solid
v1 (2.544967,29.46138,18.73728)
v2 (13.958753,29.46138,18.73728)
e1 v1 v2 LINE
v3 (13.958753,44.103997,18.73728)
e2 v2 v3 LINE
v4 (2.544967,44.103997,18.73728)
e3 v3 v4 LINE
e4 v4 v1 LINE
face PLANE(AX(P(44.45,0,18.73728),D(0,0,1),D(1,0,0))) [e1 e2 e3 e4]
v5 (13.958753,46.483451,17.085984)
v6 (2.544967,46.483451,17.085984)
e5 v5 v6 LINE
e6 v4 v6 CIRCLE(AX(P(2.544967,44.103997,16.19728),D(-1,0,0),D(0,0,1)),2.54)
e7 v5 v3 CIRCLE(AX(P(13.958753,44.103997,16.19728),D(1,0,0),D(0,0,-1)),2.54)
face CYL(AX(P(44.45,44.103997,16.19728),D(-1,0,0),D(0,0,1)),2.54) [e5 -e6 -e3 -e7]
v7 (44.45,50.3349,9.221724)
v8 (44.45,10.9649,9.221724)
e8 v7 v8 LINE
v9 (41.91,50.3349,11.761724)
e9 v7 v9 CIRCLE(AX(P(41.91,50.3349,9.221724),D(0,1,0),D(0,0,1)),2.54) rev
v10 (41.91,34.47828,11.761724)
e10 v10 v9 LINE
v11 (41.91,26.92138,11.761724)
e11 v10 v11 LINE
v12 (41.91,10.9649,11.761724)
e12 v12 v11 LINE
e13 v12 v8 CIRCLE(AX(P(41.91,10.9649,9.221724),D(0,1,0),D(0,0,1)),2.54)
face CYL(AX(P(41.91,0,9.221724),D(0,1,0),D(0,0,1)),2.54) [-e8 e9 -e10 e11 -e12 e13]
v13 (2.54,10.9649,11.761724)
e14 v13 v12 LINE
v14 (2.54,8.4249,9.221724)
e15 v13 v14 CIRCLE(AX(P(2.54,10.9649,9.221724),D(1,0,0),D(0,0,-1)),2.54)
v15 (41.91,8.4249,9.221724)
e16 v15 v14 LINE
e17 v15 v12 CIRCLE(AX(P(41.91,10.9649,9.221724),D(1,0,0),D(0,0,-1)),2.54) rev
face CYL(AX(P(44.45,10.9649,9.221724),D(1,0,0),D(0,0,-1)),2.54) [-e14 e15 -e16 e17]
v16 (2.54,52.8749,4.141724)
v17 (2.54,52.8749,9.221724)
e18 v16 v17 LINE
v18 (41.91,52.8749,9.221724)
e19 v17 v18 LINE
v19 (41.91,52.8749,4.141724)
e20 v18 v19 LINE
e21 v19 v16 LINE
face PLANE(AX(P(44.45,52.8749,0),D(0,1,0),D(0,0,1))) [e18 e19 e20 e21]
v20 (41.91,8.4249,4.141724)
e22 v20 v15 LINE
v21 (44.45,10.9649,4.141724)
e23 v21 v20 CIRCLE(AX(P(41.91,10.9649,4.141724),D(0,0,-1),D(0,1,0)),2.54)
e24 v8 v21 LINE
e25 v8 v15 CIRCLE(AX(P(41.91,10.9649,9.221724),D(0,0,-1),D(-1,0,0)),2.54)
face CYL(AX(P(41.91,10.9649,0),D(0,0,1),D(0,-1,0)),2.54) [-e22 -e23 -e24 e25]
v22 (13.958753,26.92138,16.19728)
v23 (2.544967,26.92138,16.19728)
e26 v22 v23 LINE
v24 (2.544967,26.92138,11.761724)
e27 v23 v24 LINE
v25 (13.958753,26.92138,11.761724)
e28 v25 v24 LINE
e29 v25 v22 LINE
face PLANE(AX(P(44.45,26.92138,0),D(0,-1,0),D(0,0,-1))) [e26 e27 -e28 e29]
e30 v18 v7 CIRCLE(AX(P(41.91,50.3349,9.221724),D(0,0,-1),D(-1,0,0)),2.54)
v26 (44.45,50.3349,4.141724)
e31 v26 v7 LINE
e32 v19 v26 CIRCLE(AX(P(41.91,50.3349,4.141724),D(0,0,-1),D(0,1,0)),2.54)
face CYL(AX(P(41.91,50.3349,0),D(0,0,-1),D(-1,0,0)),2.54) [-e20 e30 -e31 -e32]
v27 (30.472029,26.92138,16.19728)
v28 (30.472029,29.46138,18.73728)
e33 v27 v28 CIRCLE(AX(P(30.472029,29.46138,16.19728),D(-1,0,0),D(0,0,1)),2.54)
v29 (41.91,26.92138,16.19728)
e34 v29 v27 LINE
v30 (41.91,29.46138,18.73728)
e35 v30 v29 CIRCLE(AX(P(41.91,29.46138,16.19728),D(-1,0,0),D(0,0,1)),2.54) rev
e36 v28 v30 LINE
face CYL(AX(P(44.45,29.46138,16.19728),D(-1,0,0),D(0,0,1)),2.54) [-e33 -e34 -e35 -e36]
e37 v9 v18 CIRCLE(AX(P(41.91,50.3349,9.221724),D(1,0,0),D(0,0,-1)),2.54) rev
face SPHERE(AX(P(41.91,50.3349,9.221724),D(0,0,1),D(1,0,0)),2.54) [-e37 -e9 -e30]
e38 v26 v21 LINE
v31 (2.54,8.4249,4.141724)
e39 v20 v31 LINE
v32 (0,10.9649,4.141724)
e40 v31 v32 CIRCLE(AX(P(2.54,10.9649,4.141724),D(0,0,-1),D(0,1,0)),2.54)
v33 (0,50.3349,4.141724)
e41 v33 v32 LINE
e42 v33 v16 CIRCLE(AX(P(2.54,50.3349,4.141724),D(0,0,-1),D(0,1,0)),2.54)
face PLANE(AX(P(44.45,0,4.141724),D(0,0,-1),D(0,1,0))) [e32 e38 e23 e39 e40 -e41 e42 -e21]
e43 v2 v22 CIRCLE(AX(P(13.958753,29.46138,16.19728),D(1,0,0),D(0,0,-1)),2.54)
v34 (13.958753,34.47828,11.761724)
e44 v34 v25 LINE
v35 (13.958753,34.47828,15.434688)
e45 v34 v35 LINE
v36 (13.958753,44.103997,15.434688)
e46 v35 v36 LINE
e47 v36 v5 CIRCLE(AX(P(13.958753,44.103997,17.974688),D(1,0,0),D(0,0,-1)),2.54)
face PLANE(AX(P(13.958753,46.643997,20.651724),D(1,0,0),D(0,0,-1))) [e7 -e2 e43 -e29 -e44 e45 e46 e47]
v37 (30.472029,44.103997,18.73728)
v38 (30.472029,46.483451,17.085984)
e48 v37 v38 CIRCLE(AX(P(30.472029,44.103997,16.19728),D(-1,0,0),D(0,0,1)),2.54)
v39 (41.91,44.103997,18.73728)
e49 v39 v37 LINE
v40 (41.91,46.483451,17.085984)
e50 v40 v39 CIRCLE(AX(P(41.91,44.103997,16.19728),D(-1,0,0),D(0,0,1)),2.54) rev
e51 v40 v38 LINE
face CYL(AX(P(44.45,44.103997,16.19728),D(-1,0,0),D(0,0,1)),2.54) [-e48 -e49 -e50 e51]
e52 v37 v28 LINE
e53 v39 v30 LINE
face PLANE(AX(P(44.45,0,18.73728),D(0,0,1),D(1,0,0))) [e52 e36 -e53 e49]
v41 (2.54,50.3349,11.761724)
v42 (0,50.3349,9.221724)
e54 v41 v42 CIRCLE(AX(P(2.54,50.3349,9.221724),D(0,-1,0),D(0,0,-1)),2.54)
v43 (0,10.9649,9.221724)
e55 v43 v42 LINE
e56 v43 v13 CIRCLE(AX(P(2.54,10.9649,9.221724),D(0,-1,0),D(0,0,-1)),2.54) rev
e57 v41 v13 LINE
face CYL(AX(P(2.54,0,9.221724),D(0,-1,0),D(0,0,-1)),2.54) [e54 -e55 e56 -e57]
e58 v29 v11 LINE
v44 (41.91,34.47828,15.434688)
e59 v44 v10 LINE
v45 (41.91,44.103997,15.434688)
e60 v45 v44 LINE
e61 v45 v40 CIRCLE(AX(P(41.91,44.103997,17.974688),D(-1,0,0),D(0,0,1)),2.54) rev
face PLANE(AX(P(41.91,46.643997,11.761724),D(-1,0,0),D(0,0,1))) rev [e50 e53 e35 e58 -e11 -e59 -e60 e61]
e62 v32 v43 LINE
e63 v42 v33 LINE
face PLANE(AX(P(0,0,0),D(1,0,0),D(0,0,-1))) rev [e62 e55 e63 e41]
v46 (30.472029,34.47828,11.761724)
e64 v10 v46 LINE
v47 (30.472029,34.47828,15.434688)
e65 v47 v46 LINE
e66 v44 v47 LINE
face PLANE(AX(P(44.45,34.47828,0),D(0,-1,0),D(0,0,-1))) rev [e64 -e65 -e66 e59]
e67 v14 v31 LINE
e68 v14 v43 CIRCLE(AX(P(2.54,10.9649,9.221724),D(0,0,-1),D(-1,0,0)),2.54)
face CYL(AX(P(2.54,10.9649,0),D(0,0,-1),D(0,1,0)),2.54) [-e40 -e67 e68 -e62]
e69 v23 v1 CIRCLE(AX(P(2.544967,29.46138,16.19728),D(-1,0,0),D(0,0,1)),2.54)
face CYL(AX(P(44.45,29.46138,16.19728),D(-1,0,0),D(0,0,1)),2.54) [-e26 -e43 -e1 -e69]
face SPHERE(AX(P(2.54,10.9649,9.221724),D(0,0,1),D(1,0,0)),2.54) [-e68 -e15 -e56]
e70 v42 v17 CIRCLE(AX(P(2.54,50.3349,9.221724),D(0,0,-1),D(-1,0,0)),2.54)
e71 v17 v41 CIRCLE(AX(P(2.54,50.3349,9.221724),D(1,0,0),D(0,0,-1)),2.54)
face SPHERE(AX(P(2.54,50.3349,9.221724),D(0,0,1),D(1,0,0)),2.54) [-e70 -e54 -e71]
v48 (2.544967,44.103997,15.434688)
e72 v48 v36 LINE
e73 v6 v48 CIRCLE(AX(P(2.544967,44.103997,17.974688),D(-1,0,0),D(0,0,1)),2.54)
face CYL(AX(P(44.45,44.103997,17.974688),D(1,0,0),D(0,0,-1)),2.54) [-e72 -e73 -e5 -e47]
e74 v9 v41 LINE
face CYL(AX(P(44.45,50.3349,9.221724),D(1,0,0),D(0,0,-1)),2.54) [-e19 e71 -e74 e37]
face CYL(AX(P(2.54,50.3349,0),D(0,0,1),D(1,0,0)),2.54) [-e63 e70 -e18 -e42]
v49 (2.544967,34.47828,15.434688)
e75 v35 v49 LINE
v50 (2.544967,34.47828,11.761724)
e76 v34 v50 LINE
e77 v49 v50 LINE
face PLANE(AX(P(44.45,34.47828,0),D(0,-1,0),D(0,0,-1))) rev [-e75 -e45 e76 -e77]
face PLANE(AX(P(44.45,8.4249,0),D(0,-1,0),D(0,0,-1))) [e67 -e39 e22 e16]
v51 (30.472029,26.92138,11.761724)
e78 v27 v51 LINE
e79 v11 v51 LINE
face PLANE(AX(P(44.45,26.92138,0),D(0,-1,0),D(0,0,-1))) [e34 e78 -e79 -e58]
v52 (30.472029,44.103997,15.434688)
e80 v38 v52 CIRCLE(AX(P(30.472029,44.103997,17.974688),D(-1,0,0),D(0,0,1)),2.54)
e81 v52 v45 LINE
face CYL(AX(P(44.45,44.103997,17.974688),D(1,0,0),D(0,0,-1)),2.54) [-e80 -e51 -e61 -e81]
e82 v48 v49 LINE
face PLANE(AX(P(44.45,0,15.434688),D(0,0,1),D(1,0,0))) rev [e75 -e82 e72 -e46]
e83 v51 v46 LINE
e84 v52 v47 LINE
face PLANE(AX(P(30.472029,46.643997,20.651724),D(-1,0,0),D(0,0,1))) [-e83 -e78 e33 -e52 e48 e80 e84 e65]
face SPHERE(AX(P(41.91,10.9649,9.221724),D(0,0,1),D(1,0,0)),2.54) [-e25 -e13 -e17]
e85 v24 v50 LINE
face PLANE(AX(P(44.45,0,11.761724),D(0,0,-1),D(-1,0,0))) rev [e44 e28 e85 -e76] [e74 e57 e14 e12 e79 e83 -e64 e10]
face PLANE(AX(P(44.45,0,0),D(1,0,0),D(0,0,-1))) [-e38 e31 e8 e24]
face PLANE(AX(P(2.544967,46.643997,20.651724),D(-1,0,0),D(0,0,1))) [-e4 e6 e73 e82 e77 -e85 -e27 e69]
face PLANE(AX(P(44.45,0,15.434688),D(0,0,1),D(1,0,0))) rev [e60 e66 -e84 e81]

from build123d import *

# Parameters (mm, degrees)
BOSS_EXTRUDE1_DEPTH     = 44.45
CUT_EXTRUDE1_DEPTH      = 6.35
CUT_EXTRUDE1_DEPTH_BACK = 3.81
SKETCH2_W               = 2.54
SKETCH2_H               = 19.817543538
CUT_EXTRUDE2_DEPTH      = 5.08
CUT_EXTRUDE2_DEPTH_BACK = 3.81
SKETCH4_W               = 2.544966755
SKETCH4_H               = 19.817543538
CUT_EXTRUDE3_DEPTH      = 5.08
CUT_EXTRUDE3_DEPTH_BACK = 3.81
SKETCH8_W               = 16.513276495
SKETCH8_H               = 19.817543538
FILLET3_DEPTH           = 44.45
FILLET3_START           = 7
FILLET3_2_DEPTH         = 47
FILLET4_R               = 2.54
FILLET5_R               = 2.54
FILLET6_R               = 2.54


with BuildPart() as part:
    # Sketch1 → Boss-Extrude1 (new body)
    with BuildSketch(Plane(origin=(0, 0, 0), x_dir=(0, 0, -1), z_dir=(1, 0, 0))):
        Polygon((-4.141724441, 52.87490044), (-11.761724441, 52.87490044), (-11.761724441, 34.478280211), (-15.434687804, 34.478280211), (-15.434687804, 46.643996602), (-18.737279906, 46.643996602), (-18.737279906, 26.921380181), (-11.761724441, 26.921380181), (-11.761724441, 8.42490044), (-4.141724441, 8.42490044), align=None)
    extrude(amount=BOSS_EXTRUDE1_DEPTH)

    # Sketch2 → Cut-Extrude1 (cut, two sides: drawn at the far end of the back side and taken through both)
    with BuildSketch(Plane.XY.offset(15.571724441).offset(-CUT_EXTRUDE1_DEPTH_BACK)):
        with Locations((43.18, 36.735224833)):
            Rectangle(SKETCH2_W, SKETCH2_H)
    extrude(amount=CUT_EXTRUDE1_DEPTH + CUT_EXTRUDE1_DEPTH_BACK, mode=Mode.SUBTRACT)

    # Sketch4 → Cut-Extrude2 (cut, two sides: drawn at the far end of the back side and taken through both)
    with BuildSketch(Plane.XY.offset(15.571724441).offset(-CUT_EXTRUDE2_DEPTH_BACK)):
        with Locations((1.272483378, 36.735224833)):
            Rectangle(SKETCH4_W, SKETCH4_H)
    extrude(amount=CUT_EXTRUDE2_DEPTH + CUT_EXTRUDE2_DEPTH_BACK, mode=Mode.SUBTRACT)

    # Sketch8 → Cut-Extrude3 (cut, two sides: drawn at the far end of the back side and taken through both)
    with BuildSketch(Plane.XY.offset(15.571724441).offset(-CUT_EXTRUDE3_DEPTH_BACK)):
        with Locations((22.215391178, 36.735224833)):
            Rectangle(SKETCH8_W, SKETCH8_H)
    extrude(amount=CUT_EXTRUDE3_DEPTH + CUT_EXTRUDE3_DEPTH_BACK, mode=Mode.SUBTRACT)

    # Fillet3: read off the stored shape, not the designer's step
    # Fillet3 outline → Fillet3 (cut)
    with BuildSketch(Plane.YZ):
        with BuildLine():
            ThreePointArc((8.42490044, 9.221724441), (9.168849215, 11.017775666), (10.96490044, 11.761724441))
            Line((10.96490044, 11.761724441), (8.42490044, 11.761724441))
            Line((8.42490044, 11.761724441), (8.42490044, 9.221724441))
        make_face()
        with BuildLine():
            ThreePointArc((50.33490044, 11.761724441), (52.130951664, 11.017775665), (52.87490044, 9.221724441))
            Line((52.87490044, 9.221724441), (52.87490044, 11.761724441))
            Line((52.87490044, 11.761724441), (50.33490044, 11.761724441))
        make_face()
    extrude(amount=FILLET3_DEPTH, mode=Mode.SUBTRACT)

    # Fillet3 2 outline → Fillet3 2 (cut)
    with BuildSketch(Plane(origin=(0, 0, 0), x_dir=(1, 0, 0), z_dir=(0, 1, 0)).offset(FILLET3_START)):
        with BuildLine():
            Line((0, -11.761724441), (2.54, -11.761724441))
            ThreePointArc((2.54, -11.761724441), (0.743948776, -11.017775665), (0, -9.221724441))
            Line((0, -9.221724441), (0, -11.761724441))
        make_face()
        with BuildLine():
            ThreePointArc((44.45, -9.221724441), (43.706051224, -11.017775665), (41.91, -11.761724441))
            Line((41.91, -11.761724441), (44.45, -11.761724441))
            Line((44.45, -11.761724441), (44.45, -9.221724441))
        make_face()
    extrude(amount=FILLET3_2_DEPTH, mode=Mode.SUBTRACT)

    # Fillet4
    # the kernel refuses this fillet: 2.54 mm, written as the material it takes off along each edge
    with BuildSketch(Plane(origin=(41.91, 50.33490044, 9.221724441), x_dir=(1, 0, 0), z_dir=(0, 1, 0))) as fillet4_piece_1_section:
        Polygon((0, 0), (FILLET4_R, 0), (FILLET4_R, -FILLET4_R), (0, -FILLET4_R), align=None)
    fillet4_piece_1 = extrude(amount=FILLET4_R, mode=Mode.PRIVATE)
    fillet4_piece_1 = fillet4_piece_1 - Plane(origin=(41.91, 50.33490044, 9.221724441), x_dir=(-0.7071067811865475, 0, -0.7071067811865475), z_dir=(0, 1, 0)) * Sphere(FILLET4_R, mode=Mode.PRIVATE)
    add(fillet4_piece_1, mode=Mode.SUBTRACT)
    with BuildSketch(Plane(origin=(2.54, 50.33490044, 9.221724441), x_dir=(-1, 0, 0), z_dir=(0, 1, 0))) as fillet4_piece_2_section:
        Polygon((0, 0), (FILLET4_R, 0), (FILLET4_R, FILLET4_R), (0, FILLET4_R), align=None)
    fillet4_piece_2 = extrude(amount=FILLET4_R, mode=Mode.PRIVATE)
    fillet4_piece_2 = fillet4_piece_2 - Plane(origin=(2.54, 50.33490044, 9.221724441), x_dir=(0.7071067811865475, 0, -0.7071067811865475), z_dir=(0, 1, 0)) * Sphere(FILLET4_R, mode=Mode.PRIVATE)
    add(fillet4_piece_2, mode=Mode.SUBTRACT)
    with BuildSketch(Plane(origin=(41.91, 10.96490044, 9.221724441), x_dir=(0, -1, 0), z_dir=(1, 0, 0))) as fillet4_piece_3_section:
        Polygon((0, 0), (FILLET4_R, 0), (FILLET4_R, -FILLET4_R), (0, -FILLET4_R), align=None)
    fillet4_piece_3 = extrude(amount=FILLET4_R, mode=Mode.PRIVATE)
    fillet4_piece_3 = fillet4_piece_3 - Plane(origin=(41.91, 10.96490044, 9.221724441), x_dir=(0, 0.7071067811865476, -0.7071067811865475), z_dir=(1, 0, 0)) * Sphere(FILLET4_R, mode=Mode.PRIVATE)
    add(fillet4_piece_3, mode=Mode.SUBTRACT)
    with BuildSketch(Plane(origin=(2.54, 10.96490044, 9.221724441), x_dir=(0, -1, 0), z_dir=(-1, 0, 0))) as fillet4_piece_4_section:
        Polygon((0, 0), (FILLET4_R, 0), (FILLET4_R, FILLET4_R), (0, FILLET4_R), align=None)
    fillet4_piece_4 = extrude(amount=FILLET4_R, mode=Mode.PRIVATE)
    fillet4_piece_4 = fillet4_piece_4 - Plane(origin=(2.54, 10.96490044, 9.221724441), x_dir=(0, 0.7071067811865476, -0.7071067811865475), z_dir=(-1, 0, 0)) * Sphere(FILLET4_R, mode=Mode.PRIVATE)
    add(fillet4_piece_4, mode=Mode.SUBTRACT)
    with BuildSketch(Plane(origin=(0, 52.87490044, -2.208275559), x_dir=(1, 0, 0), z_dir=(0, 0, 1)), Plane(origin=(44.45, 8.42490044, 9.221724441), x_dir=(0, 1, 0), z_dir=(0, 0, -1))) as fillet4_piece_5:
        with BuildLine():
            CenterArc((FILLET4_R, -FILLET4_R), FILLET4_R, 90, 90)
            Line((0, -FILLET4_R), (0, 0))
            Line((0, 0), (FILLET4_R, 0))
        make_face()
    extrude(amount=11.43, mode=Mode.SUBTRACT)
    with BuildSketch(Plane(origin=(44.45, 52.87490044, -2.208275559), x_dir=(-1, 0, 0), z_dir=(0, 0, 1)), Plane(origin=(0, 8.42490044, 9.221724441), x_dir=(0, 1, 0), z_dir=(0, 0, -1))) as fillet4_piece_6:
        with BuildLine():
            CenterArc((FILLET4_R, FILLET4_R), FILLET4_R, 180, 90)
            Line((0, FILLET4_R), (0, 0))
            Line((0, 0), (FILLET4_R, 0))
        make_face()
    extrude(amount=11.43, mode=Mode.SUBTRACT)

    # Fillet5
    # the kernel refuses this fillet: 2.54 mm, written as the material it takes off along each edge
    with BuildSketch(Plane(origin=(24.122029425, 46.643996602, 18.737279906), x_dir=(0, -1, 0), z_dir=(1, 0, 0)), Plane(origin=(24.122029425, 46.643996602, 15.434687804), x_dir=(0, 0, 1), z_dir=(1, 0, 0))) as fillet5_piece_1:
        with BuildLine():
            CenterArc((FILLET5_R, FILLET5_R), FILLET5_R, 180, 90)
            Line((0, FILLET5_R), (0, 0))
            Line((0, 0), (FILLET5_R, 0))
        make_face()
    extrude(amount=24.137970575, mode=Mode.SUBTRACT)
    with BuildSketch(Plane(origin=(-3.805033245, 46.643996602, 18.737279906), x_dir=(0, 0, -1), z_dir=(1, 0, 0)), Plane(origin=(-3.805033245, 46.643996602, 15.434687804), x_dir=(0, -1, 0), z_dir=(1, 0, 0))) as fillet5_piece_2:
        with BuildLine():
            CenterArc((FILLET5_R, -FILLET5_R), FILLET5_R, 90, 90)
            Line((0, -FILLET5_R), (0, 0))
            Line((0, 0), (FILLET5_R, 0))
        make_face()
    extrude(amount=24.113786175, mode=Mode.SUBTRACT)

    # Fillet6
    fillet6_edges = [part.edges().sort_by_distance(p)[0] for p in [
        (36.191014713, 26.921380181, 18.737279906),
        (8.251859842, 26.921380181, 18.737279906),
    ]]
    fillet(fillet6_edges, radius=FILLET6_R)


solid = part.part
